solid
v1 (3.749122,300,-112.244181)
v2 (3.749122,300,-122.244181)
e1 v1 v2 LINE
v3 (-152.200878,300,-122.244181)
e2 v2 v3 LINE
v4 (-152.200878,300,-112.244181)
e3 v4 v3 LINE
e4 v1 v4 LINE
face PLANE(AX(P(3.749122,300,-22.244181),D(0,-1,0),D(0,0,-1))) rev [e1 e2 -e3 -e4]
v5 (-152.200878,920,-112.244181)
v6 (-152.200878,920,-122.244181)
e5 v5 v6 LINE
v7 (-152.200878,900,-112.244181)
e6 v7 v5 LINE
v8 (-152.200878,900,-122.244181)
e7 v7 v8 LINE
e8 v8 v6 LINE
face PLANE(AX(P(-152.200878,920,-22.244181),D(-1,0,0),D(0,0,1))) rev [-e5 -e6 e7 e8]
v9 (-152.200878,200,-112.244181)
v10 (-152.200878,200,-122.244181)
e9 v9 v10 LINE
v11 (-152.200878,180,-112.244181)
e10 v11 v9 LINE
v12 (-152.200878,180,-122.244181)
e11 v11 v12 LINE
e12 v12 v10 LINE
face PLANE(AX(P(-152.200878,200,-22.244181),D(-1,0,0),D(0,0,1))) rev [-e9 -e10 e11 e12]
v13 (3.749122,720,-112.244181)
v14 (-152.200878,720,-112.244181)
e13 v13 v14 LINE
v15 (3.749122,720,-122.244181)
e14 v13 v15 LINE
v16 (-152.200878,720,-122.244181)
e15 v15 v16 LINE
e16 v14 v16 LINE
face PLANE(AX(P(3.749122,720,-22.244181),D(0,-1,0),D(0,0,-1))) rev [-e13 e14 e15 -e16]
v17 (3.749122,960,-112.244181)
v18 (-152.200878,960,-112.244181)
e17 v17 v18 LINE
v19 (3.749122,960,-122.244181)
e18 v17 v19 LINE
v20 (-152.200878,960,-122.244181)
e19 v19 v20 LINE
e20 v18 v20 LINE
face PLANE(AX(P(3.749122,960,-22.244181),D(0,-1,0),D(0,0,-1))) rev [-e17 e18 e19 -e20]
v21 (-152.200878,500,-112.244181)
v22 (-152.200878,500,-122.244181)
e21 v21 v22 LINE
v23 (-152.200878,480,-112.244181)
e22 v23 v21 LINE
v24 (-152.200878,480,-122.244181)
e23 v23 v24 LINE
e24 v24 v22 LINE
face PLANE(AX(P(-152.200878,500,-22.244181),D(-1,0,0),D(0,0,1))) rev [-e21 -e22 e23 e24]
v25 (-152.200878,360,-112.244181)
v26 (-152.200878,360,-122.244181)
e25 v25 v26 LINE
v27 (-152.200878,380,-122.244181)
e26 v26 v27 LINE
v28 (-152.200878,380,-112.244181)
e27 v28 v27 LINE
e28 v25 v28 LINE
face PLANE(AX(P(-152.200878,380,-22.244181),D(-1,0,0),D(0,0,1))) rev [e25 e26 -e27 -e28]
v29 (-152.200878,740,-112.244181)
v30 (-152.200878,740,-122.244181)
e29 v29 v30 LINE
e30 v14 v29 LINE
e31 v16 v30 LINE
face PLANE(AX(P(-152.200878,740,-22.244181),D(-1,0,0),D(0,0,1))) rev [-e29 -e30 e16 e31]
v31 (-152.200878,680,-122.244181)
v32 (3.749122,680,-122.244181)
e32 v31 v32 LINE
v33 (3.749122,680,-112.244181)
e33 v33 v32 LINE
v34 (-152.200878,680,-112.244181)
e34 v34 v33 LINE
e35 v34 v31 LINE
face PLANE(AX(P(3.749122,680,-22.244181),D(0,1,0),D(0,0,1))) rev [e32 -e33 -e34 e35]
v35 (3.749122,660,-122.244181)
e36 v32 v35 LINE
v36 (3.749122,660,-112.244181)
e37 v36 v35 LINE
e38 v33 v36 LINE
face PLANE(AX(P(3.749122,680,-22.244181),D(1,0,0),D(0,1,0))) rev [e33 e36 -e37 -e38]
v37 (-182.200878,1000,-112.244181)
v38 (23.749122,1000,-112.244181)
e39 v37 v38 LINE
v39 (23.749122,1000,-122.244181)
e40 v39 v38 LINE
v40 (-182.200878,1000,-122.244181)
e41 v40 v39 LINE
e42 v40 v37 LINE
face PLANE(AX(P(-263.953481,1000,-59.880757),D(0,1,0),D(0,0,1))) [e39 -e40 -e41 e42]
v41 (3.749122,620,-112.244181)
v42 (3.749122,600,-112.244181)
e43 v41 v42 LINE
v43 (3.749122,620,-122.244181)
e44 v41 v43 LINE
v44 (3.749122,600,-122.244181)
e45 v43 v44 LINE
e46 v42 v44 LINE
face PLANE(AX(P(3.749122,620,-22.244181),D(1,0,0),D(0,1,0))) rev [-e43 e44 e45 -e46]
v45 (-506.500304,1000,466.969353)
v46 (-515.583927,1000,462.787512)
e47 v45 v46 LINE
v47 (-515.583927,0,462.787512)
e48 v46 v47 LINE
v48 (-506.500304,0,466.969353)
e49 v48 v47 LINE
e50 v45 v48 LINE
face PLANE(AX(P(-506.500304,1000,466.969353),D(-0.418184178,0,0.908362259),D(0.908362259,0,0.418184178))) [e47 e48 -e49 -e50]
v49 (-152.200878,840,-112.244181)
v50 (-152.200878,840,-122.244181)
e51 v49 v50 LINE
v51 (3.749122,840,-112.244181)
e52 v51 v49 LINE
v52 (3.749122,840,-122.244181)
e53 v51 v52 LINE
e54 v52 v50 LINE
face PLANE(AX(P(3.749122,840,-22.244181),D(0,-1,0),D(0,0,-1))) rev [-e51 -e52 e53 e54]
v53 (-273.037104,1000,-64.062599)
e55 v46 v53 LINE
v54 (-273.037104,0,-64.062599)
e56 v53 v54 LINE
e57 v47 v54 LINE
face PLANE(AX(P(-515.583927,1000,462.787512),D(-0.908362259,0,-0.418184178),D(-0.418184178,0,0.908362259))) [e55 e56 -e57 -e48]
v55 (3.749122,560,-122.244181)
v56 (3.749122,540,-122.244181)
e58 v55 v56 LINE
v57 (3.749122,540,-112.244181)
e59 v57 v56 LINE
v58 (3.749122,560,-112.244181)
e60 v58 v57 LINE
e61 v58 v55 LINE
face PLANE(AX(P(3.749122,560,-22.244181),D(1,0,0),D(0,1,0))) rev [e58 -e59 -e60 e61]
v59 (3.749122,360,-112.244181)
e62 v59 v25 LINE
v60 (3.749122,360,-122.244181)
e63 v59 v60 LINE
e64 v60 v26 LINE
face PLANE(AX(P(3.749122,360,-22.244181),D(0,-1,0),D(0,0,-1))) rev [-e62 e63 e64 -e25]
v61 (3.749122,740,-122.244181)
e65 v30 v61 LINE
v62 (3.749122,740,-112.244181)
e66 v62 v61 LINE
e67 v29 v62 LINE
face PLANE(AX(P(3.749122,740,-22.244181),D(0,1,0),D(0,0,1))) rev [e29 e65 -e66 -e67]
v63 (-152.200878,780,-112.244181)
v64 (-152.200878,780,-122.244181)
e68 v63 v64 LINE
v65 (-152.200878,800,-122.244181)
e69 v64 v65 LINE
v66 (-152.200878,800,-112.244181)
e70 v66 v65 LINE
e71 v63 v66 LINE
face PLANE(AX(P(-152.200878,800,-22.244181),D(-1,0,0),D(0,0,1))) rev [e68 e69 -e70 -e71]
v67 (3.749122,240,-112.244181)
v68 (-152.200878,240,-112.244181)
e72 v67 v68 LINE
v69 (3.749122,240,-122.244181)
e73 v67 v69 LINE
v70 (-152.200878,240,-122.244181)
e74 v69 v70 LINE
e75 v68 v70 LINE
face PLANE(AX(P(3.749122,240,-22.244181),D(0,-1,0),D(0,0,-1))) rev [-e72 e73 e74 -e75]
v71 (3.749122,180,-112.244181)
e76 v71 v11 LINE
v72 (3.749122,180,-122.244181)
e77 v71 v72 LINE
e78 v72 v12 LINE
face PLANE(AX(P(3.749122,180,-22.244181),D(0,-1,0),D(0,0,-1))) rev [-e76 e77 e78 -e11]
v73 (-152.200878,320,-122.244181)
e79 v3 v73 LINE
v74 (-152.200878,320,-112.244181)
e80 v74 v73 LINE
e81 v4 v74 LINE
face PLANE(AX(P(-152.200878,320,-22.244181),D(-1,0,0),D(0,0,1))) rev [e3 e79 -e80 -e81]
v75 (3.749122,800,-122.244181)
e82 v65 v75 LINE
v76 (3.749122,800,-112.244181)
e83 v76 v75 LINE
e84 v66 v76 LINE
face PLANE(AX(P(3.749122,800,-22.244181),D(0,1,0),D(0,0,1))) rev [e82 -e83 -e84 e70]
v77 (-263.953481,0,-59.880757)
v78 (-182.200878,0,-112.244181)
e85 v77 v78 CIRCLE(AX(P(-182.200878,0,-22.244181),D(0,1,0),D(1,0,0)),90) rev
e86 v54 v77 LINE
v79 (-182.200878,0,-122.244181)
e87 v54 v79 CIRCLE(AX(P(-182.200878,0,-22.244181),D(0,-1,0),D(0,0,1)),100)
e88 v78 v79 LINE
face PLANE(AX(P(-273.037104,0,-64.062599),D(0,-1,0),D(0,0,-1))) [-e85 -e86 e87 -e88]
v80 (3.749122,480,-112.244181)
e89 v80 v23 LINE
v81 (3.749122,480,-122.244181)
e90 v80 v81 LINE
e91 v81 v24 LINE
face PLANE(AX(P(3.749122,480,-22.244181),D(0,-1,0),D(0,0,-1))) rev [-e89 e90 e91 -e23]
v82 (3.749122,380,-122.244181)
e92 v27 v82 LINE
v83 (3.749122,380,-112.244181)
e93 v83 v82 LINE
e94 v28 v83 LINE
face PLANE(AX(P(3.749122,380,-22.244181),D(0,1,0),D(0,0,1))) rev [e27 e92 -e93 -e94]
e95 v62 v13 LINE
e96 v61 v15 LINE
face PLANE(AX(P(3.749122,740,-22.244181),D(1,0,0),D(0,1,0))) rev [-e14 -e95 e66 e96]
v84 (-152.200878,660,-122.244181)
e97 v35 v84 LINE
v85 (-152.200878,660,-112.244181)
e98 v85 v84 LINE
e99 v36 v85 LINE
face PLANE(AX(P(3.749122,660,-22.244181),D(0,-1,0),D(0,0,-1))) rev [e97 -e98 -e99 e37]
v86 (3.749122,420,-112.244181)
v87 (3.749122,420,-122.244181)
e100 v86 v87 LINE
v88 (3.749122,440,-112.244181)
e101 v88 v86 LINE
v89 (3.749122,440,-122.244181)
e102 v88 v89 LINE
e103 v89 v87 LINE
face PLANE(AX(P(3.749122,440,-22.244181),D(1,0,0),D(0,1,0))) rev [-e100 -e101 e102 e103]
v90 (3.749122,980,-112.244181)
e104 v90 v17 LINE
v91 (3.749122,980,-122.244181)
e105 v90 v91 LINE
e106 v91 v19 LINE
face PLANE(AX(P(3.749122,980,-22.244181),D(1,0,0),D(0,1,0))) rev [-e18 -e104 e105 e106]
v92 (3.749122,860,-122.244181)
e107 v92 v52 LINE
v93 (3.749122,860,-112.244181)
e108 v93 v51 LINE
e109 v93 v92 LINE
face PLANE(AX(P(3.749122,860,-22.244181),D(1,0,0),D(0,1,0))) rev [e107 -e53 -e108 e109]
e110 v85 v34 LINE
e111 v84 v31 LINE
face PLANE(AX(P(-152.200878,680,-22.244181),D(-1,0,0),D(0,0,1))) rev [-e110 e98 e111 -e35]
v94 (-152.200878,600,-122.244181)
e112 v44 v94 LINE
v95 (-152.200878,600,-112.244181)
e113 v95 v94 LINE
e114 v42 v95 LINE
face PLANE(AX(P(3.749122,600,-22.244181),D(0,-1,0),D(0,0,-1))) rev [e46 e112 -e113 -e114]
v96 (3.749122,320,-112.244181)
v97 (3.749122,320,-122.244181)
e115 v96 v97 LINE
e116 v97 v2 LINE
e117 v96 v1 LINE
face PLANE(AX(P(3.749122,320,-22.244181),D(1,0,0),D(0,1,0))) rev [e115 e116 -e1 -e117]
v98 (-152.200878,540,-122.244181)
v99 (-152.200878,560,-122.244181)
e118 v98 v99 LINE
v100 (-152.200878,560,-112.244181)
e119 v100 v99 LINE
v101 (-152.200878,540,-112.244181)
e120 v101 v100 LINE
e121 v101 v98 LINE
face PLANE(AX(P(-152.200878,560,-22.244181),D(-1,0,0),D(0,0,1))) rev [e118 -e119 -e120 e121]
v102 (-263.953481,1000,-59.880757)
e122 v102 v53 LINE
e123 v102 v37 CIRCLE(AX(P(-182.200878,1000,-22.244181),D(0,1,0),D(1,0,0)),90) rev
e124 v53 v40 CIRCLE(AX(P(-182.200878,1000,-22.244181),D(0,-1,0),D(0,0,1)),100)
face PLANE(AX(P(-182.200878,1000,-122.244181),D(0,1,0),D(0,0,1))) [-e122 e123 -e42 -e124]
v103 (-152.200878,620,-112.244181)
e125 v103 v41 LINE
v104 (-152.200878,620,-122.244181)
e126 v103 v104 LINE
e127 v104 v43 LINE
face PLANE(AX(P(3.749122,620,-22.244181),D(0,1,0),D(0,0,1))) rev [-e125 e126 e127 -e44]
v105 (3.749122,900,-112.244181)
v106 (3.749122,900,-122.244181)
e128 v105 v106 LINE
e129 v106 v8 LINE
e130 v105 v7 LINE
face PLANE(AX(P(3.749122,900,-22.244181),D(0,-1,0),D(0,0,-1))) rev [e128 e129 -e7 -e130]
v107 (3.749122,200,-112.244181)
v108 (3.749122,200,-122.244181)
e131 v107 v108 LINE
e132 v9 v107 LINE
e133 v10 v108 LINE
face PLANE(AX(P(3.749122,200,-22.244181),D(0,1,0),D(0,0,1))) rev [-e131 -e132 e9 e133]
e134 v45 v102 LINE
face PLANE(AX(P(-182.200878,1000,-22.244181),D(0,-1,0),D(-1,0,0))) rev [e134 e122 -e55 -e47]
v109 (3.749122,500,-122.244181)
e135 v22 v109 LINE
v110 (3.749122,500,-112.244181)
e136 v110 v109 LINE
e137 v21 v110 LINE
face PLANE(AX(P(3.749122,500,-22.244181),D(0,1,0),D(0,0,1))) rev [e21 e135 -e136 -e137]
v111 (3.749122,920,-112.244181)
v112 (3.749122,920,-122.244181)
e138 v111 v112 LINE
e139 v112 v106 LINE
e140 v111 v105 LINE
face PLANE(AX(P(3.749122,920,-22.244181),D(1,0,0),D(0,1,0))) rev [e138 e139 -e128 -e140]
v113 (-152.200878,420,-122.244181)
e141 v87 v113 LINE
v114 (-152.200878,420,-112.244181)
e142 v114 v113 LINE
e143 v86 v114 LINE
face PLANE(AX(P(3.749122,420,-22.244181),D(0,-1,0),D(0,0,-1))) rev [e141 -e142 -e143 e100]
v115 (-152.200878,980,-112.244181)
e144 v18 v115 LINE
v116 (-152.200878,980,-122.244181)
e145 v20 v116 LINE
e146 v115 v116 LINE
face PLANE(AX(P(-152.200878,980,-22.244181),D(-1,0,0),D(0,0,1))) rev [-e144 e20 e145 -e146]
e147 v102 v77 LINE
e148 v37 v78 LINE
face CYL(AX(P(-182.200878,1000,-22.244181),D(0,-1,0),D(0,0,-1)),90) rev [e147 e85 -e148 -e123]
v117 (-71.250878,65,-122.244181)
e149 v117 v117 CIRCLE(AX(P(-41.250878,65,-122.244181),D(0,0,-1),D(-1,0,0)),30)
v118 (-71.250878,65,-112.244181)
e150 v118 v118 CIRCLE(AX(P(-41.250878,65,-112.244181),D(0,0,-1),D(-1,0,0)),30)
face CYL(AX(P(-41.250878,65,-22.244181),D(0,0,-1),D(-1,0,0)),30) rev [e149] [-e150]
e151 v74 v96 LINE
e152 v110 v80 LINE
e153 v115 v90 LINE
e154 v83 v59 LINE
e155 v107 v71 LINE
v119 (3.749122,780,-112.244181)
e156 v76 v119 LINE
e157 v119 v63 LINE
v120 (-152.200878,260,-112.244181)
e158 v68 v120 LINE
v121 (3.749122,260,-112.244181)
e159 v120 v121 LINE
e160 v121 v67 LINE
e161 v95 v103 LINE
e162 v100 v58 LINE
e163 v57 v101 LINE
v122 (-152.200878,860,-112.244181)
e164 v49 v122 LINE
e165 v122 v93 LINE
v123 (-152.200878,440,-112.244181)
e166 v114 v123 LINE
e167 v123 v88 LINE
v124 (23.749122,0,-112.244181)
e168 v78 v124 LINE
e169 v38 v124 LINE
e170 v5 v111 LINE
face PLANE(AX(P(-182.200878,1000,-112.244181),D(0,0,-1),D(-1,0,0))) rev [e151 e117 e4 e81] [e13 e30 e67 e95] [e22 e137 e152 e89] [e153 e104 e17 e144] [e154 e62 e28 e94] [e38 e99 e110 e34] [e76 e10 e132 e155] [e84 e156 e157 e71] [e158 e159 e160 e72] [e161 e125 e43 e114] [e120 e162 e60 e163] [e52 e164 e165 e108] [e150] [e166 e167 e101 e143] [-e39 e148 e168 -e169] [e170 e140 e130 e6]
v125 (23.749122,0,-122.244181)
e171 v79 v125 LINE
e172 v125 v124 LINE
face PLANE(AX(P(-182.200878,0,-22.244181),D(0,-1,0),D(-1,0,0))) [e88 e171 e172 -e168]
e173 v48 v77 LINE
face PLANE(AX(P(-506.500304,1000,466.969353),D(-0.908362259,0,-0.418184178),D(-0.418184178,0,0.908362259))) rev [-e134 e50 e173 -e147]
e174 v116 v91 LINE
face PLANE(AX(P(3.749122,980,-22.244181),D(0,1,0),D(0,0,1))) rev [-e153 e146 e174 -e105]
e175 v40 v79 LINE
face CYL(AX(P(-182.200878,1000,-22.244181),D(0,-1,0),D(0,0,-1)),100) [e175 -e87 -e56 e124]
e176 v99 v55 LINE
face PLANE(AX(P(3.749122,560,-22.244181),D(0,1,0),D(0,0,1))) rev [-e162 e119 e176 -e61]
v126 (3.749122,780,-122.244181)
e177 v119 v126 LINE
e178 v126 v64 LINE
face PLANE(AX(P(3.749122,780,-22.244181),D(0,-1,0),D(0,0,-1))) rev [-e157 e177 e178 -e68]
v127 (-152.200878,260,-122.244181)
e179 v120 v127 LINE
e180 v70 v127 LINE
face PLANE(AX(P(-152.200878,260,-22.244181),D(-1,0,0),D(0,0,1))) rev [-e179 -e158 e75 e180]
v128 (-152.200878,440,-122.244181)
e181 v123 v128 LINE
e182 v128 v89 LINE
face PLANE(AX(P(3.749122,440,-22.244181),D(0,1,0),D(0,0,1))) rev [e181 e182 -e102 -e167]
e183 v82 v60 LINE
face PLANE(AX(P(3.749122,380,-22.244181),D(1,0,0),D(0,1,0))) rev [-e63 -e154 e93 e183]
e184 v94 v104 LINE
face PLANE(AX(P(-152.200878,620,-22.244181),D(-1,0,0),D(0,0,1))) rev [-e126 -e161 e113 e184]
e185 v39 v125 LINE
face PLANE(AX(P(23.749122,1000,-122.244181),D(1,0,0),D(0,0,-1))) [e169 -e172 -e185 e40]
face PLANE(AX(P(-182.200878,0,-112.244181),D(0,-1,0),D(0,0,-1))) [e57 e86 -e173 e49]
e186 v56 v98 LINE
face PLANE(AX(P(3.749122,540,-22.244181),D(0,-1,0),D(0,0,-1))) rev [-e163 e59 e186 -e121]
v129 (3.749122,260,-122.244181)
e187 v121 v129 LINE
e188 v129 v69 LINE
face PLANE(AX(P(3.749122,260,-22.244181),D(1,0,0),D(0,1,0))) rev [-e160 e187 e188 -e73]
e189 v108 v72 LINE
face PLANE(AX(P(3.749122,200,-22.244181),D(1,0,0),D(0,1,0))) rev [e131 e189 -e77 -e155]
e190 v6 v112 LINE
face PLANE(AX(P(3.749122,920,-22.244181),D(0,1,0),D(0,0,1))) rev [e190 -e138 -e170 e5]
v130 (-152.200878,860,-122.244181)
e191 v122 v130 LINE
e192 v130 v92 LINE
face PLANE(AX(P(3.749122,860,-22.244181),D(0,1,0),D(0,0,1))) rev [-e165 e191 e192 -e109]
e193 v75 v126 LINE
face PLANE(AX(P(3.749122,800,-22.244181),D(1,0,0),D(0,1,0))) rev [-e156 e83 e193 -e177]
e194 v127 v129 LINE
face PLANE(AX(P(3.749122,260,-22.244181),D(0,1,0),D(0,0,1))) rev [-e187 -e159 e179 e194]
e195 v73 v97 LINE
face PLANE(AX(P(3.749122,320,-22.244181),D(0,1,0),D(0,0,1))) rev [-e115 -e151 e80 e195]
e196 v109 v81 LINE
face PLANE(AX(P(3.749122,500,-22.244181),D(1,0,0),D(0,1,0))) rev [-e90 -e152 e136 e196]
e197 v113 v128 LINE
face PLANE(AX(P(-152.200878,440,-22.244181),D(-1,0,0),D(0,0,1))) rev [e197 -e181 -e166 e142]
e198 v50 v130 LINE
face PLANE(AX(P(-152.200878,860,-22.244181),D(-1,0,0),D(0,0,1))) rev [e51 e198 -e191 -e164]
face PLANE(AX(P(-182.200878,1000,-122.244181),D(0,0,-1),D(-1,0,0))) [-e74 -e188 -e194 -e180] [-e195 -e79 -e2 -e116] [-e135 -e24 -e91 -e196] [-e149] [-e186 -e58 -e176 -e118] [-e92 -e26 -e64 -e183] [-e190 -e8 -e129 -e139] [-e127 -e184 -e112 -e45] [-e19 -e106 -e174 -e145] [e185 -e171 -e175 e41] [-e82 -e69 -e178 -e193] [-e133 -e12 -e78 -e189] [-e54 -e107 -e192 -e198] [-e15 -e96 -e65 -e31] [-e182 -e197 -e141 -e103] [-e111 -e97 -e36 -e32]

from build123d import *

# Parameters (mm, degrees)
BASE_FLANGE1_DEPTH = 1000
SKETCH9_W          = 155.95
SKETCH9_H          = 20
CUT_EXTRUDE1_DEPTH = 100
LPATTERN1_COUNT    = 14
LPATTERN1_PITCH    = 60
SKETCH10_R         = 30
CUT_EXTRUDE2_DEPTH = 100


# Sheet-metal steps are written as plain solids
with BuildPart() as part:
    # Sketch4 → Base-Flange1 (new body)
    with BuildSketch(Plane(origin=(0, 0, 0), x_dir=(1, 0, 0), z_dir=(0, 1, 0))):
        with BuildLine():
            Line((-515.583926996, -462.787511714), (-273.037104037, 64.062598538))
            ThreePointArc((-273.037104037, 64.062598538), (-236.13675777, 106.451786664), (-182.200878132, 122.244180787))
            Line((-182.200878132, 122.244180787), (23.749121868, 122.244180787))
            Line((23.749121868, 122.244180787), (23.749121868, 112.244180787))
            Line((23.749121868, 112.244180787), (-182.200878132, 112.244180787))
            ThreePointArc((-182.200878132, 112.244180787), (-230.743169807, 98.031026076), (-263.953481446, 59.880756763))
            Line((-263.953481446, 59.880756763), (-506.500304406, -466.969353489))
            Line((-506.500304406, -466.969353489), (-515.583926996, -462.787511714))
        make_face()
    extrude(amount=BASE_FLANGE1_DEPTH)

    # Sketch9 → Cut-Extrude1 (cut)
    with BuildSketch(Plane(origin=(0, 0, -122.244180787), x_dir=(-1, 0, 0), z_dir=(0, 0, -1))):
        with Locations((74.225878132, 970)):
            Rectangle(SKETCH9_W, SKETCH9_H)
    cut_extrude1 = extrude(amount=-CUT_EXTRUDE1_DEPTH, mode=Mode.SUBTRACT)

    # LPattern1: Cut-Extrude1 ×14
    with Locations(*[(0, -i * LPATTERN1_PITCH, 0) for i in range(1, LPATTERN1_COUNT)]):
        add(cut_extrude1, mode=Mode.SUBTRACT)

    # Sketch10 → Cut-Extrude2 (cut)
    with BuildSketch(Plane(origin=(0, 0, -122.244180787), x_dir=(-1, 0, 0), z_dir=(0, 0, -1))):
        with Locations((41.250878132, 65)):
            Circle(SKETCH10_R)
    extrude(amount=-CUT_EXTRUDE2_DEPTH, mode=Mode.SUBTRACT)


solid = part.part
